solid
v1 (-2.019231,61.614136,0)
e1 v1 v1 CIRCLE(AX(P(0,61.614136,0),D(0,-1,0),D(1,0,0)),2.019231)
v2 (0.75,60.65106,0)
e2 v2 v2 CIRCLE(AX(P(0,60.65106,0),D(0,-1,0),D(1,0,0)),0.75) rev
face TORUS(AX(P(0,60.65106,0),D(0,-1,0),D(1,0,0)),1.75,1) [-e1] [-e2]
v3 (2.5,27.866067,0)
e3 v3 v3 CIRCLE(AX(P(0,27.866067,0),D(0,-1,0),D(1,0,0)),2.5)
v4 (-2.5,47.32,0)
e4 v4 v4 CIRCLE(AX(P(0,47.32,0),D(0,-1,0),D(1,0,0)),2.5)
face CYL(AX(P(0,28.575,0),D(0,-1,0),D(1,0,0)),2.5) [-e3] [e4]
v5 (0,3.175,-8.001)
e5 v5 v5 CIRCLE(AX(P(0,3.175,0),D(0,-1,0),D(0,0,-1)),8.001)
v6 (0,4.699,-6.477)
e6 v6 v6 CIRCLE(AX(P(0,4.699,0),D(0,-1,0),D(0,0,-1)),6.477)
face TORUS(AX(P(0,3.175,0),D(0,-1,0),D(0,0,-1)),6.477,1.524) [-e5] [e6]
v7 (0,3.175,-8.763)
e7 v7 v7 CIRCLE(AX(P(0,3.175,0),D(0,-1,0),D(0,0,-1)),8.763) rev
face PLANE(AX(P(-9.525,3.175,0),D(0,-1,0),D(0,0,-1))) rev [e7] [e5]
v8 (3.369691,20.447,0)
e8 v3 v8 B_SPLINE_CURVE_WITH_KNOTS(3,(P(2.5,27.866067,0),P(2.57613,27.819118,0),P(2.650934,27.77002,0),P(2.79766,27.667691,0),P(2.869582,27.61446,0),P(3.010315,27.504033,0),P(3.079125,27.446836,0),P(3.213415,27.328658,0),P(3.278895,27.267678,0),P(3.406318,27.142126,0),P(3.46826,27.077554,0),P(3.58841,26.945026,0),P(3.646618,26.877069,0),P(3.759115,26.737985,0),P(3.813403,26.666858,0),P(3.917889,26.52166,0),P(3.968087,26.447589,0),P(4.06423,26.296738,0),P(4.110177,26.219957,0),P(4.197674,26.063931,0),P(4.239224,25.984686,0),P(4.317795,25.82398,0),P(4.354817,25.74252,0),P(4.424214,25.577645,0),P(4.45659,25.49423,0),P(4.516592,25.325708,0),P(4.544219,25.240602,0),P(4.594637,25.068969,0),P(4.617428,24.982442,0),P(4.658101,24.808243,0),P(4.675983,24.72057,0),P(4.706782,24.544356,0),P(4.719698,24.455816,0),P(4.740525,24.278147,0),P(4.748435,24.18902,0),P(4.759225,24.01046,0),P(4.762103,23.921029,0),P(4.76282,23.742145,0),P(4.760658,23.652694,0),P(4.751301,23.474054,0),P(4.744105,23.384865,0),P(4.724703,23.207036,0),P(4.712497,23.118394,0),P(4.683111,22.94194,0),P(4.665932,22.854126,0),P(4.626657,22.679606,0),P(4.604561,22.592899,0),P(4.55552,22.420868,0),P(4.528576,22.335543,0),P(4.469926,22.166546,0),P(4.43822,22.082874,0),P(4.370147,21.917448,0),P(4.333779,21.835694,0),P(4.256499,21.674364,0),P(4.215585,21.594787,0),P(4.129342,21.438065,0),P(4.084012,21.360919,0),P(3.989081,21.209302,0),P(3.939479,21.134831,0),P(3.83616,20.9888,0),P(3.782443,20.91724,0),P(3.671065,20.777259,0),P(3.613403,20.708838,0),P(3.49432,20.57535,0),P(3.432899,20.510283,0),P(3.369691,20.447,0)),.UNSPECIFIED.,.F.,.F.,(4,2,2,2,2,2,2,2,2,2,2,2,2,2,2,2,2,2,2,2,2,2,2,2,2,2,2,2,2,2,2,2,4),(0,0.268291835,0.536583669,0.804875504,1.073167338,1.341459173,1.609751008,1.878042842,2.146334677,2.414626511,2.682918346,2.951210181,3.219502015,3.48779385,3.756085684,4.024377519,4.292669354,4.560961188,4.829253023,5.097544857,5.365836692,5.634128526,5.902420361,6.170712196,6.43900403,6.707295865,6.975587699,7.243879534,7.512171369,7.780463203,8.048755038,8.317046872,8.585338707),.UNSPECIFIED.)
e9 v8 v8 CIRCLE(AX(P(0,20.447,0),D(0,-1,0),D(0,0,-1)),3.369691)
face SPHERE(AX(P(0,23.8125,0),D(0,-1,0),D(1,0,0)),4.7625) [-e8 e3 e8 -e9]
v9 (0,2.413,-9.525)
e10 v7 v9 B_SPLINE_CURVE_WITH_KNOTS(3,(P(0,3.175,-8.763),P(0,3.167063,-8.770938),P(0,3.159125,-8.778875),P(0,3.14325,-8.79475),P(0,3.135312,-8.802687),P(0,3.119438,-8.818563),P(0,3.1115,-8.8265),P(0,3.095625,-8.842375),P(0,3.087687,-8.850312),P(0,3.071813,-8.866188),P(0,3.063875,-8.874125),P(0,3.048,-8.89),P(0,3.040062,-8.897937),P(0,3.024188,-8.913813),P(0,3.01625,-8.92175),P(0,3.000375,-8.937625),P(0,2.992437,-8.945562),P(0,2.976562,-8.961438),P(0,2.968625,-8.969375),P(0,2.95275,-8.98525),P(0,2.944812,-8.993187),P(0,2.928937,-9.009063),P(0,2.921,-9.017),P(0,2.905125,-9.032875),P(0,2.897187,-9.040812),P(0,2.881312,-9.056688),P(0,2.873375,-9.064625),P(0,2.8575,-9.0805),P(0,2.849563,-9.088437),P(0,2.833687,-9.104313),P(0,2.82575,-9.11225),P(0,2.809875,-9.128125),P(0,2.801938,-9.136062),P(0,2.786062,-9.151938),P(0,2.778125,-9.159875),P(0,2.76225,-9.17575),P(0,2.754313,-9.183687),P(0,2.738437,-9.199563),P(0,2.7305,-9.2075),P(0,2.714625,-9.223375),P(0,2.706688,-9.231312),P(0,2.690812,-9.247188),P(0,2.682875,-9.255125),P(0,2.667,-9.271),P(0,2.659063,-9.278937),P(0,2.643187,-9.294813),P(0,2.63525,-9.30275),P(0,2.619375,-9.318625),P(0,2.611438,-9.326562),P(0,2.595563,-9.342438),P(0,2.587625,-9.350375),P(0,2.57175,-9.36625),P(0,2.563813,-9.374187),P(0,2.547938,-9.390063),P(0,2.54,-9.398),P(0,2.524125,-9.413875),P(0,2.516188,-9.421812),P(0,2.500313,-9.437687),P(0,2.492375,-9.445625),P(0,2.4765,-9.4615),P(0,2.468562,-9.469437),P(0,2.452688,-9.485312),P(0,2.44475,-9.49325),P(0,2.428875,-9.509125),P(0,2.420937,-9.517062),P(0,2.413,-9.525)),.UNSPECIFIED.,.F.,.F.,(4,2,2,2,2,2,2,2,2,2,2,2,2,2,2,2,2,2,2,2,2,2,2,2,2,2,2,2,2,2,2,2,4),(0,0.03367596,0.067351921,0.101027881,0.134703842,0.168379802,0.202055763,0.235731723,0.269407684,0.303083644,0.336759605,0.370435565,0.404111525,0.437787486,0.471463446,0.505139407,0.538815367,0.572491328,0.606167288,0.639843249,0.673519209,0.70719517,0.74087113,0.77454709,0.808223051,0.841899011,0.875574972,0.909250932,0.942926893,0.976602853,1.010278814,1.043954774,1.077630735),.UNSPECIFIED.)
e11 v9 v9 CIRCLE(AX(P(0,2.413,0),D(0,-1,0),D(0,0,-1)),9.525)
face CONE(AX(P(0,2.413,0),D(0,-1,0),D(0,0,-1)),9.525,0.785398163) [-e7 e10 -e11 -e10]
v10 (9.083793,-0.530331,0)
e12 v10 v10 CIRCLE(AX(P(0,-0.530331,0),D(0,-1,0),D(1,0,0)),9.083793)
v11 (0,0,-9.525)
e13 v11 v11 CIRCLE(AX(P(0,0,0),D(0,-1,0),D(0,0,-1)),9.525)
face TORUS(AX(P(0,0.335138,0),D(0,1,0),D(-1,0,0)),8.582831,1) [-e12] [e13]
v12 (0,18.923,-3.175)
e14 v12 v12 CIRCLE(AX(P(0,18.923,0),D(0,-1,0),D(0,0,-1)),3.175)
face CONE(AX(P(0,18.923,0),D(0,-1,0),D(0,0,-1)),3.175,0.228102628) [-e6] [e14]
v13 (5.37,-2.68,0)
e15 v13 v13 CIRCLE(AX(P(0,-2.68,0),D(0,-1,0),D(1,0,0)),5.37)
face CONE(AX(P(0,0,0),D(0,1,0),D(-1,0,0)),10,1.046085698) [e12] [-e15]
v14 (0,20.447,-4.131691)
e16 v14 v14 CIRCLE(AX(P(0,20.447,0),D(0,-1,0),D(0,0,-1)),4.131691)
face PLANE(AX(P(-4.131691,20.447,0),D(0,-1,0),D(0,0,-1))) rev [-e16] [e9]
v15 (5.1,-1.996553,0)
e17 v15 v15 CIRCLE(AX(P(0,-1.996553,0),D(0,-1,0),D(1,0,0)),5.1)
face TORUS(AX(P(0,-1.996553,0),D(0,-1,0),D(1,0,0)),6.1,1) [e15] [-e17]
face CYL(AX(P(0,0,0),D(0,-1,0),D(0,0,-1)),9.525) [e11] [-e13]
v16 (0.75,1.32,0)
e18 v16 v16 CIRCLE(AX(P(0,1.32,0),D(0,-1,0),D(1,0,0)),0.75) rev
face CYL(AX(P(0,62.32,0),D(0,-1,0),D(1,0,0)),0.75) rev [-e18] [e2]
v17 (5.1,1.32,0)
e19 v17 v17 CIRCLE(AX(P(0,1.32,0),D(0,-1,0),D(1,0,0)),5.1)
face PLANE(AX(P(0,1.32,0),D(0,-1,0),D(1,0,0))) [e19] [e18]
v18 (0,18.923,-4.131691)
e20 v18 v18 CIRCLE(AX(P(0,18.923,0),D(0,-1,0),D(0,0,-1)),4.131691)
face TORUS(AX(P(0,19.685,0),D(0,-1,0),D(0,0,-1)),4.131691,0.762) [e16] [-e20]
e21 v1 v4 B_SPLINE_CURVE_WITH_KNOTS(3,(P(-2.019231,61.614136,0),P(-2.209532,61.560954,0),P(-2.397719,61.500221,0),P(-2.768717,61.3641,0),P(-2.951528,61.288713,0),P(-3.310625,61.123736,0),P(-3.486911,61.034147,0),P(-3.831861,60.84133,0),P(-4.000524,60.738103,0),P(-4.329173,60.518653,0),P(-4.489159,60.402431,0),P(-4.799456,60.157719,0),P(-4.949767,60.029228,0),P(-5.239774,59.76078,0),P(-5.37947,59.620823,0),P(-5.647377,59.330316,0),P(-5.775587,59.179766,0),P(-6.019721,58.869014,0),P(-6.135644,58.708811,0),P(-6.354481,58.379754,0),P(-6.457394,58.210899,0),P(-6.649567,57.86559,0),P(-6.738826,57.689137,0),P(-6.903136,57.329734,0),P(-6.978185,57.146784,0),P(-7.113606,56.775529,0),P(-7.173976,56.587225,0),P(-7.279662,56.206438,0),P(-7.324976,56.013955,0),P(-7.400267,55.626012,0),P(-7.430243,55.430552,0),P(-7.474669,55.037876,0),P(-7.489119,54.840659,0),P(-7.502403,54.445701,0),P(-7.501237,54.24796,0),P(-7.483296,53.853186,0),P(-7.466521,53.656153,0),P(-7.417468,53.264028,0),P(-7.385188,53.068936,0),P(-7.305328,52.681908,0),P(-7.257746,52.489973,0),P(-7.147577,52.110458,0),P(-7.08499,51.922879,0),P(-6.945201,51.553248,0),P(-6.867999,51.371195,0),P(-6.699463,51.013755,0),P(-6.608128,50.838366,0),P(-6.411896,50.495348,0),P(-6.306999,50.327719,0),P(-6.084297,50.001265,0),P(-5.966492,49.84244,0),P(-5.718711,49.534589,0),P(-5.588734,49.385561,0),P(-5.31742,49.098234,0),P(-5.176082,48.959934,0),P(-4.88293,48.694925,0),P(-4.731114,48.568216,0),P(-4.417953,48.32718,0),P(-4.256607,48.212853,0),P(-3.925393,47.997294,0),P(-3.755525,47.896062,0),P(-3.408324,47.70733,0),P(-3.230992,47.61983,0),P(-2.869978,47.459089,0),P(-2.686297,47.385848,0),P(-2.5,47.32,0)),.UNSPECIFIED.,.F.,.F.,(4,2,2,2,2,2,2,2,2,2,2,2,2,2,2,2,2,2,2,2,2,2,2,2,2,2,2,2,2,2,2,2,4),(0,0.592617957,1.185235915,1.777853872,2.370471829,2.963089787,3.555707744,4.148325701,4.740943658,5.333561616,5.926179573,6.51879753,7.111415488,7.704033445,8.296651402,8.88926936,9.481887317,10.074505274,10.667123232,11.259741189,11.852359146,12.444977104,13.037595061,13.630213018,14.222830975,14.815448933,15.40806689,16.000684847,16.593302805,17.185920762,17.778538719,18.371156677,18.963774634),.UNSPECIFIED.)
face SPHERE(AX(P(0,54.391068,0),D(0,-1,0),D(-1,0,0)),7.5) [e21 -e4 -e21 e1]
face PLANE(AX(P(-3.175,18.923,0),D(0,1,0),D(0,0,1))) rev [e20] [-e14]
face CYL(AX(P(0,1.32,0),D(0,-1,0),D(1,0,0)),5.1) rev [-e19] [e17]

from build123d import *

# Parameters (mm, degrees)
FILLET1_R          = 1.524
CHAMFER1_SIZE      = 0.762
SKETCH5_R          = 0.75
CUT_EXTRUDE1_DEPTH = 65
FILLET2_R          = 1
SKETCH6_R          = 5.1000000000000005
CUT_EXTRUDE2_DEPTH = 4
FILLET3_R          = 1


# Some blends are built 0.0001 mm under size
with BuildPart() as part:
    # Sketch1 → Revolve1 (revolve)
    with BuildSketch(Plane.XY, mode=Mode.PRIVATE) as revolve1_sk:
        with BuildLine():
            Line((0, 0), (-9.525, -1.19e-15))
            Line((-9.525, -1.19e-15), (-9.525, 3.1749999999999985))
            Line((-9.525, 3.1749999999999985), (-8.001000000000001, 3.174999999999999))
            Line((-8.001000000000001, 3.174999999999999), (-8.001000000000001, 4.698999999999999))
            Line((-8.001000000000001, 4.698999999999999), (-6.477000000000001, 4.699))
            Line((-6.477000000000001, 4.699), (-3.1750000000000047, 18.923000000000002))
            Line((-3.1750000000000047, 18.923000000000002), (-4.131690787001095, 18.923000000000002))
            ThreePointArc((-4.131690787001095, 18.923000000000002), (-4.893690787001096, 19.685000000000002), (-4.131690787001095, 20.447000000000003))
            Line((-4.131690787001095, 20.447000000000003), (-3.369690787001095, 20.447000000000003))
            ThreePointArc((-3.369690787001095, 20.447000000000003), (-4.399409051224952, 25.63639864027583), (0, 28.575))
            Line((0, 28.575), (0, 0))
        make_face()
    revolve(revolve1_sk.sketch.rotate(Axis((0, 0, 0), (0, 1, 0)), 270), axis=Axis((0, 0, 0), (0, 1, 0)))

    # Fillet1
    fillet1_edges = [part.edges().sort_by_distance(p)[0] for p in [
        (-2.76e-15, 4.698999999999999, 8.001000000000001),
    ]]
    fillet(fillet1_edges, radius=FILLET1_R - 0.0001)  # a hair under: the kernel refuses the full size

    # Chamfer1
    chamfer1_edges = [part.edges().sort_by_distance(p)[0] for p in [
        (-3.28e-15, 3.1749999999999985, 9.525),
    ]]
    chamfer(chamfer1_edges, length=CHAMFER1_SIZE)

    # Sketch4 → Revolve2 (revolve)
    with BuildSketch(Plane.XY, mode=Mode.PRIVATE) as revolve2_sk:
        with BuildLine():
            ThreePointArc((-2.5000000000000004, 47.32), (-1.268264840443389, 46.99907861446434), (-3.4777e-13, 46.891067811865476))
            Line((-5.67e-15, 46.891067811865476), (-5.67e-15, 47.32))
            Line((0, 47.32), (-2.5, 47.32))
        make_face()
        with BuildLine():
            Line((-2.5, 47.32), (0, 47.32))
            Line((-5.67e-15, 47.32), (-5.77e-15, 61.891067811865476))
            ThreePointArc((7.873e-14, 61.891067811865476), (-7.39198919740116, 55.659332652308734), (-2.5000000000000004, 47.32))
        make_face()
        with BuildLine():
            Line((0, 27.06642499298062), (0, 28.575000000000003))
            Line((-5.54e-15, 28.575000000000003), (-5.67e-15, 46.891067811865476))
            ThreePointArc((-3.4777e-13, 46.891067811865476), (-1.268264840443389, 46.99907861446434), (-2.5000000000000004, 47.32))
            Line((-2.5, 47.32), (-2.5, 27.06642499298062))
            Line((-2.5, 27.06642499298062), (0, 27.06642499298062))
        make_face()
        Polygon((-5.37, -2.68), (0, -2.68), (0, 0), (-10.000000000000009, -1.22e-15), align=None)
    revolve(revolve2_sk.sketch.rotate(Axis((-5.54e-15, 28.575000000000003, 0), (-1e-17, 1, 0)), 180), axis=Axis((-5.54e-15, 28.575000000000003, 0), (-1e-17, 1, 0)))

    # Sketch5 → Cut-Extrude1 (cut)
    with BuildSketch(Plane.XZ.offset(2.6799999999999997)):
        Circle(SKETCH5_R)
    extrude(amount=-CUT_EXTRUDE1_DEPTH, mode=Mode.SUBTRACT)

    # Fillet2
    # the kernel refuses this fillet: 1 mm, written as the material it takes off along each edge
    with BuildSketch(Plane(origin=(-5.34e-15, 0, 0), x_dir=(1, 1e-17, 1.2e-16), z_dir=(-1.2e-16, 0, 1))) as fillet2_piece_1:
        with BuildLine():
            CenterArc((8.582830845240172, 0.3351377087394681), FILLET2_R, 300.06370450944223, 40.35538333384943)
            Line((9.083793429310006, -0.5303312331423737), (10.000000000000004, 0))
            Line((10.000000000000004, 0), (9.525000000000006, -1.29e-15))
        make_face()
    revolve(axis=Axis((-5.34e-15, 0, 0), (-1e-17, 1, 0)), mode=Mode.SUBTRACT)
    with BuildSketch(Plane(origin=(-9.16e-15, 61.85347359016511, 0), x_dir=(1, 0, 1.2e-16), z_dir=(1.2e-16, 0, -1))) as fillet2_piece_2:
        with BuildLine():
            CenterArc((1.7500000000000087, 1.2024137655251934), FILLET2_R, 180, 105.61849827564862)
            ThreePointArc((2.01923076923078, 0.23933807125219886), (1.3897771193257238, 0.09229590404412846), (0.75, 0))
            Line((0.75, 0), (0.7500000000000088, 1.2024137655251934))
        make_face()
    revolve(axis=Axis((-9.16e-15, 61.85347359016511, 0), (1e-17, -1, 0)), mode=Mode.SUBTRACT)

    # Sketch6 → Cut-Extrude2 (cut)
    with BuildSketch(Plane.XZ.offset(2.6799999999999997)):
        Circle(SKETCH6_R)
    extrude(amount=-CUT_EXTRUDE2_DEPTH, mode=Mode.SUBTRACT)

    # Fillet3
    # the kernel refuses this fillet: 1 mm, written as the material it takes off along each edge
    with BuildSketch(Plane(origin=(2e-17, -2.6799999999999997, 0), x_dir=(1, 0, 0), z_dir=(0, 0, -1))) as fillet3_piece_1:
        with BuildLine():
            CenterArc((6.1000000000000005, -0.6834471449936594), FILLET3_R, 136.8863940541022, 43.1136059458978)
            Line((5.1000000000000005, -0.6834471449936594), (5.080000000000001, -0.6834471449936594))
            Line((5.080000000000001, -0.6834471449936594), (5.080000000000001, 0))
            Line((5.080000000000001, 0), (5.1000000000000005, 0.02000000000000002))
            ThreePointArc((5.1000000000000005, 0.02000000000000002), (5.234999999999995, 0.02000000000000002), (5.355399999999989, 0.0136689428998733))
            Line((5.355399999999989, 0.0136689428998733), (5.3699999999999894, 0))
        make_face()
    revolve(axis=Axis((2e-17, -2.6799999999999997, 0), (1e-17, -1, 0)), mode=Mode.SUBTRACT)


solid = part.part
